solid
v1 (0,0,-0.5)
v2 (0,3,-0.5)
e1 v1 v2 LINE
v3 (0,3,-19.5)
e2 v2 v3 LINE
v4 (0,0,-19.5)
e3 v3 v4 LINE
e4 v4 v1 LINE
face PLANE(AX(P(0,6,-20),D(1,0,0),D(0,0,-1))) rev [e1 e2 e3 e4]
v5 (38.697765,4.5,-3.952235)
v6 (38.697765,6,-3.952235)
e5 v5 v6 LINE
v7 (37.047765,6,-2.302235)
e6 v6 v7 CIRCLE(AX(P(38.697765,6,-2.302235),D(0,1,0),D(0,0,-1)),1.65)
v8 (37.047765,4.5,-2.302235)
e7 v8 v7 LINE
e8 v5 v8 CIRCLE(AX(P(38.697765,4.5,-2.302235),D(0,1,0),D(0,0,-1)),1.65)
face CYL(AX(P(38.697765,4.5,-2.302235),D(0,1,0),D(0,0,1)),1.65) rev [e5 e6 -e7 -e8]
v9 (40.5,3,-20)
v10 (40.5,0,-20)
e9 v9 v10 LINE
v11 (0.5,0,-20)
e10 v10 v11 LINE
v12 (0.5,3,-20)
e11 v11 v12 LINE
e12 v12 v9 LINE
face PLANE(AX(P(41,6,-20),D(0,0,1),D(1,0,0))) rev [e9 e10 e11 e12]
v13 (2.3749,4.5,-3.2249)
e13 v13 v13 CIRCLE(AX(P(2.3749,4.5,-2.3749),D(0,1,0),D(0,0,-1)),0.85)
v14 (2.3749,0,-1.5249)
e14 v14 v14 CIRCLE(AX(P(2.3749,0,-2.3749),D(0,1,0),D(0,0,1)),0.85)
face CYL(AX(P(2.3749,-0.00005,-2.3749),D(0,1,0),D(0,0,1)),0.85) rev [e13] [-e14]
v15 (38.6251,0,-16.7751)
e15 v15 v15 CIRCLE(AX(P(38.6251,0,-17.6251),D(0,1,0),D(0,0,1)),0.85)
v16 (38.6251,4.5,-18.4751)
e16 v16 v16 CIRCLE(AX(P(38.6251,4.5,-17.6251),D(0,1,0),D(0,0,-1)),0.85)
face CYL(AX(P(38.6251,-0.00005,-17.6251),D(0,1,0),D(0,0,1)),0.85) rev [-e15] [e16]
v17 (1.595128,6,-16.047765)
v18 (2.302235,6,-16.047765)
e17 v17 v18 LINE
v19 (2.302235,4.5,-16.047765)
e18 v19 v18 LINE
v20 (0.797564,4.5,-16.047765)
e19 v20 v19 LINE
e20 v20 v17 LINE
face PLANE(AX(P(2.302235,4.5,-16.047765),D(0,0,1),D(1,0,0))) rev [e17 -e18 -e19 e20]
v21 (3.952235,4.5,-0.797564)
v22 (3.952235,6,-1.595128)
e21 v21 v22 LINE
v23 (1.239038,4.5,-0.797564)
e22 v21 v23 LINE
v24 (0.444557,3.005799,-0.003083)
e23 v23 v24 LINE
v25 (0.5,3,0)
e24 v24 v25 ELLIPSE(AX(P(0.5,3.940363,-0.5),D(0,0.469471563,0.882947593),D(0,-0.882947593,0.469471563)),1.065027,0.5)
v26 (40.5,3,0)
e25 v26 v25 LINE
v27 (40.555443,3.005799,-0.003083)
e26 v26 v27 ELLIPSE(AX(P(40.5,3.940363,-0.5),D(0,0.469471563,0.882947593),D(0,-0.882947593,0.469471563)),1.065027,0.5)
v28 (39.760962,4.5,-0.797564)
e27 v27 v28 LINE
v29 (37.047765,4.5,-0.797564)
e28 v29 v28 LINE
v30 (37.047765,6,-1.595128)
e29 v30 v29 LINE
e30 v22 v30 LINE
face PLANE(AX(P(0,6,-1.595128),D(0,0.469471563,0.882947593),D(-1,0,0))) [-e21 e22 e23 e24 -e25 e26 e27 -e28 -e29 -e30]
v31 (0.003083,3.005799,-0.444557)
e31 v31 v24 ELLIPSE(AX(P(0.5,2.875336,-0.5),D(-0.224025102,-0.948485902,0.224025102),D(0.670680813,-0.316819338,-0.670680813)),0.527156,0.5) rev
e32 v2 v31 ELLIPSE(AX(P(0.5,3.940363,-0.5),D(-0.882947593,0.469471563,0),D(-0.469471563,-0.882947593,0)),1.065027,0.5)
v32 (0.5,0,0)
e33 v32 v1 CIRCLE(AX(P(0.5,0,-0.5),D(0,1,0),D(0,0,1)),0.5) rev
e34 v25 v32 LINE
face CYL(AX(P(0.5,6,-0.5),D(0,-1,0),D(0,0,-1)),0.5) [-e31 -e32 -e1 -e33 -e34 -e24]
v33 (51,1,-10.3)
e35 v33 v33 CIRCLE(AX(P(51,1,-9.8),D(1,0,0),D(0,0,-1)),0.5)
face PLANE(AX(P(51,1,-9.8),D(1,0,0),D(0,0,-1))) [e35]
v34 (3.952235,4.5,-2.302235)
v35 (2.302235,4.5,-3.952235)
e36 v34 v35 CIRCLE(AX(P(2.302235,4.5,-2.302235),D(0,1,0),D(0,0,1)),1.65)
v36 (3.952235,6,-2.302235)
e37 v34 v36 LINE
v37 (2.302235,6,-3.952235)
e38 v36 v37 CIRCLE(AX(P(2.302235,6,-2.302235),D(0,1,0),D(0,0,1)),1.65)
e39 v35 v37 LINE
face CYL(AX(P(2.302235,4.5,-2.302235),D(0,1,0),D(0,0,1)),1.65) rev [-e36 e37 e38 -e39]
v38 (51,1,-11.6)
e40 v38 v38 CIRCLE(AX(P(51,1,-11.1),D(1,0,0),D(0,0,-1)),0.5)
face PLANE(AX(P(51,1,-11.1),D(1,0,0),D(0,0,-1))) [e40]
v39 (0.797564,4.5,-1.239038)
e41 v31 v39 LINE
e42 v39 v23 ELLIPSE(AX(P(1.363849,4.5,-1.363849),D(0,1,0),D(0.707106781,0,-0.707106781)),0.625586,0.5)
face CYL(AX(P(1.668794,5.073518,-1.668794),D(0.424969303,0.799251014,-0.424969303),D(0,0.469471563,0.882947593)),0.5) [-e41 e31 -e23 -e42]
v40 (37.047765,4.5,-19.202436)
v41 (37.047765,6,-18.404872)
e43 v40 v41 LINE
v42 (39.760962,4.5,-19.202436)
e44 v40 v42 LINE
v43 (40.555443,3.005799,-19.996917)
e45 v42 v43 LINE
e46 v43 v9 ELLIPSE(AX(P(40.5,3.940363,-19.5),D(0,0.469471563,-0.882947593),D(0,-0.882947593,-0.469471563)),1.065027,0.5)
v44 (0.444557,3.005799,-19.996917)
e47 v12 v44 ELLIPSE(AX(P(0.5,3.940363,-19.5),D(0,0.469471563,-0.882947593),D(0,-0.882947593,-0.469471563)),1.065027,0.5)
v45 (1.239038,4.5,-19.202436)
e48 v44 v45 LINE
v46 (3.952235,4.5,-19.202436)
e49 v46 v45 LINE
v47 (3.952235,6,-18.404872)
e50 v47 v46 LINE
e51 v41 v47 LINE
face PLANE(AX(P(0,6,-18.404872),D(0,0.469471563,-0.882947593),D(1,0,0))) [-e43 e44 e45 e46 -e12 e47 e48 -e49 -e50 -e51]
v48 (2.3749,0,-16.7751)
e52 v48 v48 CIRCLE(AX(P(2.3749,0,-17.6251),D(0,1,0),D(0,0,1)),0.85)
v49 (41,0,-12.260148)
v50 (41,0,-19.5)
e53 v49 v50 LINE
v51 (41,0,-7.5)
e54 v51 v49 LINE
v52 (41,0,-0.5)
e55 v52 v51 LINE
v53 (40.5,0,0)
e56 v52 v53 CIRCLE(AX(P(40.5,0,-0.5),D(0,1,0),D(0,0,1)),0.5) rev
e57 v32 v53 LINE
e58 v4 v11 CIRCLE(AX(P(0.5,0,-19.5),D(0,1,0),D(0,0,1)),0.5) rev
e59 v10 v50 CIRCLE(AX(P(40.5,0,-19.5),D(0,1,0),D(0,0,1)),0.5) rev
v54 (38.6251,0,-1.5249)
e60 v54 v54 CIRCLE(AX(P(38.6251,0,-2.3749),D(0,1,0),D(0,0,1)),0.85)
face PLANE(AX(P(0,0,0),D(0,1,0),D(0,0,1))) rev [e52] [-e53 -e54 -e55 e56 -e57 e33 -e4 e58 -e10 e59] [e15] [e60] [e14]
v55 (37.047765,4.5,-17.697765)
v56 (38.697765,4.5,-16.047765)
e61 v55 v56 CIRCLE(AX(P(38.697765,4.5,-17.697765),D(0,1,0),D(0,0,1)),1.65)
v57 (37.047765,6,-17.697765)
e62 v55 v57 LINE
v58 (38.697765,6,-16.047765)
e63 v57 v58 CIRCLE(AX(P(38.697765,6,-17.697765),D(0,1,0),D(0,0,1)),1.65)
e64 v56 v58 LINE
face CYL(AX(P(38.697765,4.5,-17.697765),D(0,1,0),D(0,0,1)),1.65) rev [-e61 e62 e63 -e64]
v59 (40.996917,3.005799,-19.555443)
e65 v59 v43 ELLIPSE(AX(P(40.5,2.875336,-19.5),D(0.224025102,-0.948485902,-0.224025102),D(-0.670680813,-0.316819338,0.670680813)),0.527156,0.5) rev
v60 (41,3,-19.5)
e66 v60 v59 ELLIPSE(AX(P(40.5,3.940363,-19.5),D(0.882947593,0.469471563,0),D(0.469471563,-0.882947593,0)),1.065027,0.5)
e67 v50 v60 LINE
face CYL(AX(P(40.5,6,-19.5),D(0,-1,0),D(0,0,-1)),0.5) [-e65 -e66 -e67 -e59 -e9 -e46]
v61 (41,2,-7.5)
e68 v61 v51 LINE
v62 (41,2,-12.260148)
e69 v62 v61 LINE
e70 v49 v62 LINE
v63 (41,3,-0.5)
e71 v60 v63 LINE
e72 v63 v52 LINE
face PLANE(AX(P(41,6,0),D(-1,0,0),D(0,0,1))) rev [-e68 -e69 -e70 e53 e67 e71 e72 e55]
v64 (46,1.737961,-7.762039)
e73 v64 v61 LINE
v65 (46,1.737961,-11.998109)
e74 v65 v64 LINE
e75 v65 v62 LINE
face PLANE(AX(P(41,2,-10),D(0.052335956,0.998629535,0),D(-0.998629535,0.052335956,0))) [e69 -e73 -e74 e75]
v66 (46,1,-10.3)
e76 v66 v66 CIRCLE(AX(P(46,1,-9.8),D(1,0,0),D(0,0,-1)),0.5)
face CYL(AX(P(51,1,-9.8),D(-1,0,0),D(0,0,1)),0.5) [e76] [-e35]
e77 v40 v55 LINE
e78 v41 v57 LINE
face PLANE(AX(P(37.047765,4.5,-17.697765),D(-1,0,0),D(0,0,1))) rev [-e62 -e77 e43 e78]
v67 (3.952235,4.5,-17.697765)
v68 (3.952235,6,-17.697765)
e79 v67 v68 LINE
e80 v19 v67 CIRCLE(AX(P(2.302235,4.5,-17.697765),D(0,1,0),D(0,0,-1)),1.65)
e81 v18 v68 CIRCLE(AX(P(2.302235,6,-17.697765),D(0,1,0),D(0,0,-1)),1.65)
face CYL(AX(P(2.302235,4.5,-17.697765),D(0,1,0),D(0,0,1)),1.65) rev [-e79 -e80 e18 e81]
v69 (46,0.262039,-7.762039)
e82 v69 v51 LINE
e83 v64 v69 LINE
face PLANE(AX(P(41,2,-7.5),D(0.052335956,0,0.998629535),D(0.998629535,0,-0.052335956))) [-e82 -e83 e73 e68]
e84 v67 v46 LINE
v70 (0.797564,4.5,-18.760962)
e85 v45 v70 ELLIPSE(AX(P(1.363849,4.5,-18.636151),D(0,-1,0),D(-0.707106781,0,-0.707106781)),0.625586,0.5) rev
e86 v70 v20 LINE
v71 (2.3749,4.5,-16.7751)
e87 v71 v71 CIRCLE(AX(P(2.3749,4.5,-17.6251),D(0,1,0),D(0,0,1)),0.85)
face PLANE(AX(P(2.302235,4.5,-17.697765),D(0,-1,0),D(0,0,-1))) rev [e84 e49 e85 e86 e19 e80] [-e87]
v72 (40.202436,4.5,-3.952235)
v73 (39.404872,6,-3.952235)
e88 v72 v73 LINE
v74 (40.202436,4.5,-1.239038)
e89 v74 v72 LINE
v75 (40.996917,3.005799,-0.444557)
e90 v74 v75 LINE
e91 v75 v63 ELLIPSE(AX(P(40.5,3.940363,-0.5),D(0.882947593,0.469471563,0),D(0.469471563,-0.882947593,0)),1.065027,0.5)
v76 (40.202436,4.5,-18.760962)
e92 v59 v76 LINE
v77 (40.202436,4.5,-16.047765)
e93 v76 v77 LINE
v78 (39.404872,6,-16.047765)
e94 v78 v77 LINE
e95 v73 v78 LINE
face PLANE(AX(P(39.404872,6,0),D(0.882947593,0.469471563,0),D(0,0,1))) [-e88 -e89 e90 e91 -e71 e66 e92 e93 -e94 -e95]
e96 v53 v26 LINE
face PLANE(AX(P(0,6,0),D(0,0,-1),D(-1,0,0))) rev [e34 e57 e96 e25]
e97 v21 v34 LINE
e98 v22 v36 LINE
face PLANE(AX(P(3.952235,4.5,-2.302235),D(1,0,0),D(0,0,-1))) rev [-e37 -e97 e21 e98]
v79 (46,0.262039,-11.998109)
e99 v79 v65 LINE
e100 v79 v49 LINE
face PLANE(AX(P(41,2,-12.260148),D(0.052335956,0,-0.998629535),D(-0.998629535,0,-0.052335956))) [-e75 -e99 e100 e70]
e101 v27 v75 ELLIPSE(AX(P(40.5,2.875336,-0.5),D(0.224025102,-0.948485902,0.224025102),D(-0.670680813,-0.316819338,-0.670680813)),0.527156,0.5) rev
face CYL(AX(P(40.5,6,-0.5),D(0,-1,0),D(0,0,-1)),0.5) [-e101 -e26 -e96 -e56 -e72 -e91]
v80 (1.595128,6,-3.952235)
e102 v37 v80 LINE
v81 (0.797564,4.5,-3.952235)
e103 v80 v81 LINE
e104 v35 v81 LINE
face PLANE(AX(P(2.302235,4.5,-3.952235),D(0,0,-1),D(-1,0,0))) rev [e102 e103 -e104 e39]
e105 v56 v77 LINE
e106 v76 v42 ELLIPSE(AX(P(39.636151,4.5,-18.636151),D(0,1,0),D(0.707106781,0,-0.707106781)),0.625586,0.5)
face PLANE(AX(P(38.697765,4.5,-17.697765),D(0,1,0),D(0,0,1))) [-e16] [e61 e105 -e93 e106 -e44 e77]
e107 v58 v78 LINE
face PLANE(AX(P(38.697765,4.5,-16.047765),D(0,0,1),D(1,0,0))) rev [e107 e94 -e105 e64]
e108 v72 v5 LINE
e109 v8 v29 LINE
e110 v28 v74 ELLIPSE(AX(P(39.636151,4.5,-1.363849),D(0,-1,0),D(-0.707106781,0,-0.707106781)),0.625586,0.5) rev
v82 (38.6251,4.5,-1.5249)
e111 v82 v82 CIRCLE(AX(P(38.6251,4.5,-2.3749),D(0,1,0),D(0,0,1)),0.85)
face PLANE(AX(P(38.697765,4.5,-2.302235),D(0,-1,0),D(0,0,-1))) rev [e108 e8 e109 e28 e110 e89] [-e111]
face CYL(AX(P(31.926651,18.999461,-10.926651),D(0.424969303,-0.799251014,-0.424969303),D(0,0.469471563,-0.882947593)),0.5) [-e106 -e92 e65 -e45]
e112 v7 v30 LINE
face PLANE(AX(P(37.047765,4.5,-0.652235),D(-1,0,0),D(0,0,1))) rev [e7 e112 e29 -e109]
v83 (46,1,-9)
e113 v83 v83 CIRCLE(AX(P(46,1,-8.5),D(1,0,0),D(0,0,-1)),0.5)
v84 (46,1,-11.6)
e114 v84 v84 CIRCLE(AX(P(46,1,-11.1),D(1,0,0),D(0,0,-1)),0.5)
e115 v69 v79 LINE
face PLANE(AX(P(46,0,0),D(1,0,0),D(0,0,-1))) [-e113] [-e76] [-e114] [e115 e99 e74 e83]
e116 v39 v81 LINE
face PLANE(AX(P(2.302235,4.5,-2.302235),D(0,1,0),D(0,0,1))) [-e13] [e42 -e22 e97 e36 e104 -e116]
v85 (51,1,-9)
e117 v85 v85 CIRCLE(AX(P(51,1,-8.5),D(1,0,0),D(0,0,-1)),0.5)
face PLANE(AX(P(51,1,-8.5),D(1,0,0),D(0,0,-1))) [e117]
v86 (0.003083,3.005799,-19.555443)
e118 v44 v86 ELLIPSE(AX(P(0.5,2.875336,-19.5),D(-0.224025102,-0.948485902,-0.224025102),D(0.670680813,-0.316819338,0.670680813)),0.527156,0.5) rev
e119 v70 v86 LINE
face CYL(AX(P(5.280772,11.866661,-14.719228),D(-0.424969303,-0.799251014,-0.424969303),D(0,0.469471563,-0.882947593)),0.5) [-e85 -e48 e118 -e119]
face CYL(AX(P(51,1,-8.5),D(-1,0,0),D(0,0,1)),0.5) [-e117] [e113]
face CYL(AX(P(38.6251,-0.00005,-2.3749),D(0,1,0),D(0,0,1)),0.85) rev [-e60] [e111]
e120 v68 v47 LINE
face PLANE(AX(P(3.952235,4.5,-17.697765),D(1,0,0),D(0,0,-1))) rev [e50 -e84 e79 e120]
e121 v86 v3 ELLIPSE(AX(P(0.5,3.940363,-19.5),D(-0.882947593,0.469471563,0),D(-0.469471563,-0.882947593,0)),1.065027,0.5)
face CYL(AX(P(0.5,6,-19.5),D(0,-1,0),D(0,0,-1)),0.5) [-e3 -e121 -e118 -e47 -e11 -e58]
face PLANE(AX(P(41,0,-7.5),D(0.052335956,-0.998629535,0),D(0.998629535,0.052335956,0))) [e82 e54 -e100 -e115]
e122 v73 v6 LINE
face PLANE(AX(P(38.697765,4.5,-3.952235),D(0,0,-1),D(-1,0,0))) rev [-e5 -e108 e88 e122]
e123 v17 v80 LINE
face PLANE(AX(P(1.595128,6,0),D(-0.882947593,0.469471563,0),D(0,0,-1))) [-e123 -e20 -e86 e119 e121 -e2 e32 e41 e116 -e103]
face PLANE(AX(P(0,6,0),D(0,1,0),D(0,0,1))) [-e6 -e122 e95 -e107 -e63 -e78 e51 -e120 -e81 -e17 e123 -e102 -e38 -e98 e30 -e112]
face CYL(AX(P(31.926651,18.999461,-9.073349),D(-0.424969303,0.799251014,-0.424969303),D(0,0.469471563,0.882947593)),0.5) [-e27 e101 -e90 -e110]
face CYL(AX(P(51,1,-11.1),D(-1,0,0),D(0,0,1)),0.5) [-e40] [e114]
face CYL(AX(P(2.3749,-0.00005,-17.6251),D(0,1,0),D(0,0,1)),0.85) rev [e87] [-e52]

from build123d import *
from OCP.BRepFilletAPI import BRepFilletAPI_MakeChamfer

# Parameters (mm, degrees)
SKETCH1_W           = 41
SKETCH1_H           = 20
BOSS_EXTRUDE1_DEPTH = 6
CHAMFER1_SIZE       = 3
CHAMFER1_SIZE2      = 1.595128295
BOSS_EXTRUDE2_DEPTH = 5
BOSS_EXTRUDE2_TAPER = 3
SKETCH3_R           = 0.5
BOSS_EXTRUDE3_DEPTH = 5
CUT_EXTRUDE3_DEPTH  = 1.5
SKETCH5_R           = 0.85
CUT_EXTRUDE4_DEPTH  = 55.965898527
FILLET1_R           = 0.5


with BuildPart() as part:
    # Sketch1 → Boss-Extrude1 (new body)
    with BuildSketch(Plane(origin=(0, 0, 0), x_dir=(1, 0, 0), z_dir=(0, 1, 0))):
        with Locations((20.5, 10)):
            Rectangle(SKETCH1_W, SKETCH1_H)
    extrude(amount=BOSS_EXTRUDE1_DEPTH)

    # Chamfer1: one chamfer whose edges measure the first distance from different faces: ONE call of the kernel's chamfer builder (chamfer() names one face for all edges)
    chamfer1_edges_1 = [part.edges().sort_by_distance(p)[0] for p in [
        (41, 6, -10),
    ]]
    chamfer1_side_1 = [part.faces().sort_by_distance(p)[0] for p in [
        (41, 3, -10),
    ]]
    chamfer1_edges_2 = [part.edges().sort_by_distance(p)[0] for p in [
        (20.5, 6, -20),
    ]]
    chamfer1_side_2 = [part.faces().sort_by_distance(p)[0] for p in [
        (20.5, 3, -20),
    ]]
    chamfer1_edges_3 = [part.edges().sort_by_distance(p)[0] for p in [
        (0, 6, -10),
    ]]
    chamfer1_side_3 = [part.faces().sort_by_distance(p)[0] for p in [
        (0, 3, -10),
    ]]
    chamfer1_edges_4 = [part.edges().sort_by_distance(p)[0] for p in [
        (20.5, 6, 0),
    ]]
    chamfer1_side_4 = [part.faces().sort_by_distance(p)[0] for p in [
        (20.5, 3, 0),
    ]]
    chamfer1 = BRepFilletAPI_MakeChamfer(part.part.solid().wrapped)
    for e in chamfer1_edges_1:
        chamfer1.Add(CHAMFER1_SIZE, CHAMFER1_SIZE2, e.wrapped, chamfer1_side_1[0].wrapped)  # the first distance lies on this face
    for e in chamfer1_edges_2:
        chamfer1.Add(CHAMFER1_SIZE, CHAMFER1_SIZE2, e.wrapped, chamfer1_side_2[0].wrapped)  # the first distance lies on this face
    for e in chamfer1_edges_3:
        chamfer1.Add(CHAMFER1_SIZE, CHAMFER1_SIZE2, e.wrapped, chamfer1_side_3[0].wrapped)  # the first distance lies on this face
    for e in chamfer1_edges_4:
        chamfer1.Add(CHAMFER1_SIZE, CHAMFER1_SIZE2, e.wrapped, chamfer1_side_4[0].wrapped)  # the first distance lies on this face
    add(Compound.cast(chamfer1.Shape()), mode=Mode.REPLACE)

    # Sketch2 → Boss-Extrude2 (add)
    with BuildSketch(Plane(origin=(41, 0, 0), x_dir=(0, 0, -1), z_dir=(1, 0, 0))):
        Polygon((10, 2), (7.5, 2), (7.5, 0), (12.260148274, 0), (12.260148274, 2), align=None)
    extrude(amount=BOSS_EXTRUDE2_DEPTH, taper=BOSS_EXTRUDE2_TAPER)

    # Sketch3 → Boss-Extrude3 (add)
    with BuildSketch(Plane(origin=(46, 0, 0), x_dir=(0, 0, -1), z_dir=(1, 0, 0))):
        with Locations((8.5, 1)):
            Circle(SKETCH3_R)
        with Locations((9.8, 1)):
            Circle(SKETCH3_R)
        with Locations((11.1, 1)):
            Circle(SKETCH3_R)
    extrude(amount=BOSS_EXTRUDE3_DEPTH)

    # Sketch4 → Cut-Extrude3 (cut)
    with BuildSketch(Plane(origin=(0, 6, 0), x_dir=(1, 0, 0), z_dir=(0, 1, 0))):
        with BuildLine():
            Line((38.697764924, 0.652235076), (37.047764924, 0.652235076))
            Line((37.047764924, 0.652235076), (37.047764924, 2.302235076))
            ThreePointArc((37.047764924, 2.302235076), (37.531038735, 3.468961265), (38.697764924, 3.952235076))
            Line((38.697764924, 3.952235076), (40.347764924, 3.952235076))
            Line((40.347764924, 3.952235076), (40.347764924, 2.302235076))
            Line((40.347764924, 2.302235076), (40.347764924, 0.652235076))
            Line((40.347764924, 0.652235076), (38.697764924, 0.652235076))
        make_face()
        with BuildLine():
            Line((37.047764924, 17.697764924), (37.047764924, 19.347764924))
            Line((37.047764924, 19.347764924), (38.697764924, 19.347764924))
            Line((38.697764924, 19.347764924), (40.347764924, 19.347764924))
            Line((40.347764924, 19.347764924), (40.347764924, 17.697764924))
            Line((40.347764924, 17.697764924), (40.347764924, 16.047764924))
            Line((40.347764924, 16.047764924), (38.697764924, 16.047764924))
            ThreePointArc((38.697764924, 16.047764924), (37.531038735, 16.531038735), (37.047764924, 17.697764924))
        make_face()
        with BuildLine():
            Line((2.302235076, 16.047764924), (0.652235076, 16.047764924))
            Line((0.652235076, 16.047764924), (0.652235076, 17.697764924))
            Line((0.652235076, 17.697764924), (0.652235076, 19.347764924))
            Line((0.652235076, 19.347764924), (2.302235076, 19.347764924))
            Line((2.302235076, 19.347764924), (3.952235076, 19.347764924))
            Line((3.952235076, 19.347764924), (3.952235076, 17.697764924))
            ThreePointArc((3.952235076, 17.697764924), (3.468961265, 16.531038735), (2.302235076, 16.047764924))
        make_face()
        with BuildLine():
            Line((3.952235076, 2.302235076), (3.952235076, 0.652235076))
            Line((3.952235076, 0.652235076), (2.302235076, 0.652235076))
            Line((2.302235076, 0.652235076), (0.652235076, 0.652235076))
            Line((0.652235076, 0.652235076), (0.652235076, 2.302235076))
            Line((0.652235076, 2.302235076), (0.652235076, 3.952235076))
            Line((0.652235076, 3.952235076), (2.302235076, 3.952235076))
            ThreePointArc((2.302235076, 3.952235076), (3.468961265, 3.468961265), (3.952235076, 2.302235076))
        make_face()
    extrude(amount=-CUT_EXTRUDE3_DEPTH, mode=Mode.SUBTRACT)

    # Sketch5 → Cut-Extrude4 (cut, through all)
    with BuildSketch(Plane(origin=(0, 4.5, 0), x_dir=(1, 0, 0), z_dir=(0, 1, 0))):
        with Locations(Location((38.625100388, 2.374899612, 0), (0, 0, 270))):
            Circle(SKETCH5_R)
        with Locations(Location((38.625100388, 17.625100388, 0), (0, 0, 270))):
            Circle(SKETCH5_R)
        with Locations(Location((2.374899612, 17.625100388, 0), (0, 0, 270))):
            Circle(SKETCH5_R)
        with Locations(Location((2.374899612, 2.374899612, 0), (0, 0, 270))):
            Circle(SKETCH5_R)
    extrude(amount=-CUT_EXTRUDE4_DEPTH, mode=Mode.SUBTRACT)

    # Fillet1
    # the kernel refuses this fillet: 0.5 mm, written as the material it takes off along each edge
    with BuildSketch(Plane(origin=(-0.424571433, 2.20149727, -20.424571433), x_dir=(-0.19951100260176627, -0.3752256227209219, 0.9052077617290598), z_dir=(0.42496930254486104, 0.79925101425589, 0.42496930254486104)), Plane(origin=(-0.424571433, 2.20149727, 0.424571433), x_dir=(0.9052077617290598, -0.3752256227209218, 0.19951100260176646), z_dir=(0.42496930254486104, 0.79925101425589, -0.42496930254486104))) as fillet1_piece_1:
        with BuildLine():
            CenterArc((FILLET1_R * 0.799251014256, FILLET1_R), FILLET1_R, 192.732736423, 77.267263577)
            Line((-FILLET1_R * 0.176157759496, FILLET1_R * 0.779596451735), (0, 0))
            Line((0, 0), (FILLET1_R * 0.799251014256, 0))
        make_face()
    extrude(amount=3.874884616, mode=Mode.SUBTRACT)
    with BuildSketch(Plane(origin=(0, -1.25, -20), x_dir=(0, 0, 1), z_dir=(0, 1, 0)), Plane(origin=(0, -1.25, 0), x_dir=(1, 0, 0), z_dir=(0, 1, 0))) as fillet1_piece_2:
        with BuildLine():
            CenterArc((FILLET1_R, FILLET1_R), FILLET1_R, 180, 90)
            Line((0, FILLET1_R), (0, 0))
            Line((0, 0), (FILLET1_R, 0))
        make_face()
    extrude(amount=5.5, mode=Mode.SUBTRACT)
    with BuildSketch(Plane(origin=(41.424571433, 2.20149727, 0.424571433), x_dir=(-0.9052077617290598, -0.37522562272092175, 0.1995110026017665), z_dir=(-0.42496930254486104, 0.79925101425589, -0.42496930254486104)), Plane(origin=(41.424571433, 2.20149727, -20.424571433), x_dir=(0.1995110026017654, -0.37522562272092236, 0.9052077617290599), z_dir=(-0.42496930254486104, 0.79925101425589, 0.42496930254486104))) as fillet1_piece_3:
        with BuildLine():
            CenterArc((FILLET1_R * 0.799251014256, -FILLET1_R), FILLET1_R, 90, 77.267263577)
            Line((-FILLET1_R * 0.176157759496, -FILLET1_R * 0.779596451735), (0, 0))
            Line((0, 0), (FILLET1_R * 0.799251014256, 0))
        make_face()
    extrude(amount=3.874884616, mode=Mode.SUBTRACT)
    with BuildSketch(Plane(origin=(41, -1.25, -20), x_dir=(0, 0, 1), z_dir=(0, 1, 0)), Plane(origin=(41, -1.25, 0), x_dir=(-1, 0, 0), z_dir=(0, 1, 0))) as fillet1_piece_4:
        with BuildLine():
            CenterArc((FILLET1_R, -FILLET1_R), FILLET1_R, 90, 90)
            Line((0, -FILLET1_R), (0, 0))
            Line((0, 0), (FILLET1_R, 0))
        make_face()
    extrude(amount=5.5, mode=Mode.SUBTRACT)


solid = part.part
